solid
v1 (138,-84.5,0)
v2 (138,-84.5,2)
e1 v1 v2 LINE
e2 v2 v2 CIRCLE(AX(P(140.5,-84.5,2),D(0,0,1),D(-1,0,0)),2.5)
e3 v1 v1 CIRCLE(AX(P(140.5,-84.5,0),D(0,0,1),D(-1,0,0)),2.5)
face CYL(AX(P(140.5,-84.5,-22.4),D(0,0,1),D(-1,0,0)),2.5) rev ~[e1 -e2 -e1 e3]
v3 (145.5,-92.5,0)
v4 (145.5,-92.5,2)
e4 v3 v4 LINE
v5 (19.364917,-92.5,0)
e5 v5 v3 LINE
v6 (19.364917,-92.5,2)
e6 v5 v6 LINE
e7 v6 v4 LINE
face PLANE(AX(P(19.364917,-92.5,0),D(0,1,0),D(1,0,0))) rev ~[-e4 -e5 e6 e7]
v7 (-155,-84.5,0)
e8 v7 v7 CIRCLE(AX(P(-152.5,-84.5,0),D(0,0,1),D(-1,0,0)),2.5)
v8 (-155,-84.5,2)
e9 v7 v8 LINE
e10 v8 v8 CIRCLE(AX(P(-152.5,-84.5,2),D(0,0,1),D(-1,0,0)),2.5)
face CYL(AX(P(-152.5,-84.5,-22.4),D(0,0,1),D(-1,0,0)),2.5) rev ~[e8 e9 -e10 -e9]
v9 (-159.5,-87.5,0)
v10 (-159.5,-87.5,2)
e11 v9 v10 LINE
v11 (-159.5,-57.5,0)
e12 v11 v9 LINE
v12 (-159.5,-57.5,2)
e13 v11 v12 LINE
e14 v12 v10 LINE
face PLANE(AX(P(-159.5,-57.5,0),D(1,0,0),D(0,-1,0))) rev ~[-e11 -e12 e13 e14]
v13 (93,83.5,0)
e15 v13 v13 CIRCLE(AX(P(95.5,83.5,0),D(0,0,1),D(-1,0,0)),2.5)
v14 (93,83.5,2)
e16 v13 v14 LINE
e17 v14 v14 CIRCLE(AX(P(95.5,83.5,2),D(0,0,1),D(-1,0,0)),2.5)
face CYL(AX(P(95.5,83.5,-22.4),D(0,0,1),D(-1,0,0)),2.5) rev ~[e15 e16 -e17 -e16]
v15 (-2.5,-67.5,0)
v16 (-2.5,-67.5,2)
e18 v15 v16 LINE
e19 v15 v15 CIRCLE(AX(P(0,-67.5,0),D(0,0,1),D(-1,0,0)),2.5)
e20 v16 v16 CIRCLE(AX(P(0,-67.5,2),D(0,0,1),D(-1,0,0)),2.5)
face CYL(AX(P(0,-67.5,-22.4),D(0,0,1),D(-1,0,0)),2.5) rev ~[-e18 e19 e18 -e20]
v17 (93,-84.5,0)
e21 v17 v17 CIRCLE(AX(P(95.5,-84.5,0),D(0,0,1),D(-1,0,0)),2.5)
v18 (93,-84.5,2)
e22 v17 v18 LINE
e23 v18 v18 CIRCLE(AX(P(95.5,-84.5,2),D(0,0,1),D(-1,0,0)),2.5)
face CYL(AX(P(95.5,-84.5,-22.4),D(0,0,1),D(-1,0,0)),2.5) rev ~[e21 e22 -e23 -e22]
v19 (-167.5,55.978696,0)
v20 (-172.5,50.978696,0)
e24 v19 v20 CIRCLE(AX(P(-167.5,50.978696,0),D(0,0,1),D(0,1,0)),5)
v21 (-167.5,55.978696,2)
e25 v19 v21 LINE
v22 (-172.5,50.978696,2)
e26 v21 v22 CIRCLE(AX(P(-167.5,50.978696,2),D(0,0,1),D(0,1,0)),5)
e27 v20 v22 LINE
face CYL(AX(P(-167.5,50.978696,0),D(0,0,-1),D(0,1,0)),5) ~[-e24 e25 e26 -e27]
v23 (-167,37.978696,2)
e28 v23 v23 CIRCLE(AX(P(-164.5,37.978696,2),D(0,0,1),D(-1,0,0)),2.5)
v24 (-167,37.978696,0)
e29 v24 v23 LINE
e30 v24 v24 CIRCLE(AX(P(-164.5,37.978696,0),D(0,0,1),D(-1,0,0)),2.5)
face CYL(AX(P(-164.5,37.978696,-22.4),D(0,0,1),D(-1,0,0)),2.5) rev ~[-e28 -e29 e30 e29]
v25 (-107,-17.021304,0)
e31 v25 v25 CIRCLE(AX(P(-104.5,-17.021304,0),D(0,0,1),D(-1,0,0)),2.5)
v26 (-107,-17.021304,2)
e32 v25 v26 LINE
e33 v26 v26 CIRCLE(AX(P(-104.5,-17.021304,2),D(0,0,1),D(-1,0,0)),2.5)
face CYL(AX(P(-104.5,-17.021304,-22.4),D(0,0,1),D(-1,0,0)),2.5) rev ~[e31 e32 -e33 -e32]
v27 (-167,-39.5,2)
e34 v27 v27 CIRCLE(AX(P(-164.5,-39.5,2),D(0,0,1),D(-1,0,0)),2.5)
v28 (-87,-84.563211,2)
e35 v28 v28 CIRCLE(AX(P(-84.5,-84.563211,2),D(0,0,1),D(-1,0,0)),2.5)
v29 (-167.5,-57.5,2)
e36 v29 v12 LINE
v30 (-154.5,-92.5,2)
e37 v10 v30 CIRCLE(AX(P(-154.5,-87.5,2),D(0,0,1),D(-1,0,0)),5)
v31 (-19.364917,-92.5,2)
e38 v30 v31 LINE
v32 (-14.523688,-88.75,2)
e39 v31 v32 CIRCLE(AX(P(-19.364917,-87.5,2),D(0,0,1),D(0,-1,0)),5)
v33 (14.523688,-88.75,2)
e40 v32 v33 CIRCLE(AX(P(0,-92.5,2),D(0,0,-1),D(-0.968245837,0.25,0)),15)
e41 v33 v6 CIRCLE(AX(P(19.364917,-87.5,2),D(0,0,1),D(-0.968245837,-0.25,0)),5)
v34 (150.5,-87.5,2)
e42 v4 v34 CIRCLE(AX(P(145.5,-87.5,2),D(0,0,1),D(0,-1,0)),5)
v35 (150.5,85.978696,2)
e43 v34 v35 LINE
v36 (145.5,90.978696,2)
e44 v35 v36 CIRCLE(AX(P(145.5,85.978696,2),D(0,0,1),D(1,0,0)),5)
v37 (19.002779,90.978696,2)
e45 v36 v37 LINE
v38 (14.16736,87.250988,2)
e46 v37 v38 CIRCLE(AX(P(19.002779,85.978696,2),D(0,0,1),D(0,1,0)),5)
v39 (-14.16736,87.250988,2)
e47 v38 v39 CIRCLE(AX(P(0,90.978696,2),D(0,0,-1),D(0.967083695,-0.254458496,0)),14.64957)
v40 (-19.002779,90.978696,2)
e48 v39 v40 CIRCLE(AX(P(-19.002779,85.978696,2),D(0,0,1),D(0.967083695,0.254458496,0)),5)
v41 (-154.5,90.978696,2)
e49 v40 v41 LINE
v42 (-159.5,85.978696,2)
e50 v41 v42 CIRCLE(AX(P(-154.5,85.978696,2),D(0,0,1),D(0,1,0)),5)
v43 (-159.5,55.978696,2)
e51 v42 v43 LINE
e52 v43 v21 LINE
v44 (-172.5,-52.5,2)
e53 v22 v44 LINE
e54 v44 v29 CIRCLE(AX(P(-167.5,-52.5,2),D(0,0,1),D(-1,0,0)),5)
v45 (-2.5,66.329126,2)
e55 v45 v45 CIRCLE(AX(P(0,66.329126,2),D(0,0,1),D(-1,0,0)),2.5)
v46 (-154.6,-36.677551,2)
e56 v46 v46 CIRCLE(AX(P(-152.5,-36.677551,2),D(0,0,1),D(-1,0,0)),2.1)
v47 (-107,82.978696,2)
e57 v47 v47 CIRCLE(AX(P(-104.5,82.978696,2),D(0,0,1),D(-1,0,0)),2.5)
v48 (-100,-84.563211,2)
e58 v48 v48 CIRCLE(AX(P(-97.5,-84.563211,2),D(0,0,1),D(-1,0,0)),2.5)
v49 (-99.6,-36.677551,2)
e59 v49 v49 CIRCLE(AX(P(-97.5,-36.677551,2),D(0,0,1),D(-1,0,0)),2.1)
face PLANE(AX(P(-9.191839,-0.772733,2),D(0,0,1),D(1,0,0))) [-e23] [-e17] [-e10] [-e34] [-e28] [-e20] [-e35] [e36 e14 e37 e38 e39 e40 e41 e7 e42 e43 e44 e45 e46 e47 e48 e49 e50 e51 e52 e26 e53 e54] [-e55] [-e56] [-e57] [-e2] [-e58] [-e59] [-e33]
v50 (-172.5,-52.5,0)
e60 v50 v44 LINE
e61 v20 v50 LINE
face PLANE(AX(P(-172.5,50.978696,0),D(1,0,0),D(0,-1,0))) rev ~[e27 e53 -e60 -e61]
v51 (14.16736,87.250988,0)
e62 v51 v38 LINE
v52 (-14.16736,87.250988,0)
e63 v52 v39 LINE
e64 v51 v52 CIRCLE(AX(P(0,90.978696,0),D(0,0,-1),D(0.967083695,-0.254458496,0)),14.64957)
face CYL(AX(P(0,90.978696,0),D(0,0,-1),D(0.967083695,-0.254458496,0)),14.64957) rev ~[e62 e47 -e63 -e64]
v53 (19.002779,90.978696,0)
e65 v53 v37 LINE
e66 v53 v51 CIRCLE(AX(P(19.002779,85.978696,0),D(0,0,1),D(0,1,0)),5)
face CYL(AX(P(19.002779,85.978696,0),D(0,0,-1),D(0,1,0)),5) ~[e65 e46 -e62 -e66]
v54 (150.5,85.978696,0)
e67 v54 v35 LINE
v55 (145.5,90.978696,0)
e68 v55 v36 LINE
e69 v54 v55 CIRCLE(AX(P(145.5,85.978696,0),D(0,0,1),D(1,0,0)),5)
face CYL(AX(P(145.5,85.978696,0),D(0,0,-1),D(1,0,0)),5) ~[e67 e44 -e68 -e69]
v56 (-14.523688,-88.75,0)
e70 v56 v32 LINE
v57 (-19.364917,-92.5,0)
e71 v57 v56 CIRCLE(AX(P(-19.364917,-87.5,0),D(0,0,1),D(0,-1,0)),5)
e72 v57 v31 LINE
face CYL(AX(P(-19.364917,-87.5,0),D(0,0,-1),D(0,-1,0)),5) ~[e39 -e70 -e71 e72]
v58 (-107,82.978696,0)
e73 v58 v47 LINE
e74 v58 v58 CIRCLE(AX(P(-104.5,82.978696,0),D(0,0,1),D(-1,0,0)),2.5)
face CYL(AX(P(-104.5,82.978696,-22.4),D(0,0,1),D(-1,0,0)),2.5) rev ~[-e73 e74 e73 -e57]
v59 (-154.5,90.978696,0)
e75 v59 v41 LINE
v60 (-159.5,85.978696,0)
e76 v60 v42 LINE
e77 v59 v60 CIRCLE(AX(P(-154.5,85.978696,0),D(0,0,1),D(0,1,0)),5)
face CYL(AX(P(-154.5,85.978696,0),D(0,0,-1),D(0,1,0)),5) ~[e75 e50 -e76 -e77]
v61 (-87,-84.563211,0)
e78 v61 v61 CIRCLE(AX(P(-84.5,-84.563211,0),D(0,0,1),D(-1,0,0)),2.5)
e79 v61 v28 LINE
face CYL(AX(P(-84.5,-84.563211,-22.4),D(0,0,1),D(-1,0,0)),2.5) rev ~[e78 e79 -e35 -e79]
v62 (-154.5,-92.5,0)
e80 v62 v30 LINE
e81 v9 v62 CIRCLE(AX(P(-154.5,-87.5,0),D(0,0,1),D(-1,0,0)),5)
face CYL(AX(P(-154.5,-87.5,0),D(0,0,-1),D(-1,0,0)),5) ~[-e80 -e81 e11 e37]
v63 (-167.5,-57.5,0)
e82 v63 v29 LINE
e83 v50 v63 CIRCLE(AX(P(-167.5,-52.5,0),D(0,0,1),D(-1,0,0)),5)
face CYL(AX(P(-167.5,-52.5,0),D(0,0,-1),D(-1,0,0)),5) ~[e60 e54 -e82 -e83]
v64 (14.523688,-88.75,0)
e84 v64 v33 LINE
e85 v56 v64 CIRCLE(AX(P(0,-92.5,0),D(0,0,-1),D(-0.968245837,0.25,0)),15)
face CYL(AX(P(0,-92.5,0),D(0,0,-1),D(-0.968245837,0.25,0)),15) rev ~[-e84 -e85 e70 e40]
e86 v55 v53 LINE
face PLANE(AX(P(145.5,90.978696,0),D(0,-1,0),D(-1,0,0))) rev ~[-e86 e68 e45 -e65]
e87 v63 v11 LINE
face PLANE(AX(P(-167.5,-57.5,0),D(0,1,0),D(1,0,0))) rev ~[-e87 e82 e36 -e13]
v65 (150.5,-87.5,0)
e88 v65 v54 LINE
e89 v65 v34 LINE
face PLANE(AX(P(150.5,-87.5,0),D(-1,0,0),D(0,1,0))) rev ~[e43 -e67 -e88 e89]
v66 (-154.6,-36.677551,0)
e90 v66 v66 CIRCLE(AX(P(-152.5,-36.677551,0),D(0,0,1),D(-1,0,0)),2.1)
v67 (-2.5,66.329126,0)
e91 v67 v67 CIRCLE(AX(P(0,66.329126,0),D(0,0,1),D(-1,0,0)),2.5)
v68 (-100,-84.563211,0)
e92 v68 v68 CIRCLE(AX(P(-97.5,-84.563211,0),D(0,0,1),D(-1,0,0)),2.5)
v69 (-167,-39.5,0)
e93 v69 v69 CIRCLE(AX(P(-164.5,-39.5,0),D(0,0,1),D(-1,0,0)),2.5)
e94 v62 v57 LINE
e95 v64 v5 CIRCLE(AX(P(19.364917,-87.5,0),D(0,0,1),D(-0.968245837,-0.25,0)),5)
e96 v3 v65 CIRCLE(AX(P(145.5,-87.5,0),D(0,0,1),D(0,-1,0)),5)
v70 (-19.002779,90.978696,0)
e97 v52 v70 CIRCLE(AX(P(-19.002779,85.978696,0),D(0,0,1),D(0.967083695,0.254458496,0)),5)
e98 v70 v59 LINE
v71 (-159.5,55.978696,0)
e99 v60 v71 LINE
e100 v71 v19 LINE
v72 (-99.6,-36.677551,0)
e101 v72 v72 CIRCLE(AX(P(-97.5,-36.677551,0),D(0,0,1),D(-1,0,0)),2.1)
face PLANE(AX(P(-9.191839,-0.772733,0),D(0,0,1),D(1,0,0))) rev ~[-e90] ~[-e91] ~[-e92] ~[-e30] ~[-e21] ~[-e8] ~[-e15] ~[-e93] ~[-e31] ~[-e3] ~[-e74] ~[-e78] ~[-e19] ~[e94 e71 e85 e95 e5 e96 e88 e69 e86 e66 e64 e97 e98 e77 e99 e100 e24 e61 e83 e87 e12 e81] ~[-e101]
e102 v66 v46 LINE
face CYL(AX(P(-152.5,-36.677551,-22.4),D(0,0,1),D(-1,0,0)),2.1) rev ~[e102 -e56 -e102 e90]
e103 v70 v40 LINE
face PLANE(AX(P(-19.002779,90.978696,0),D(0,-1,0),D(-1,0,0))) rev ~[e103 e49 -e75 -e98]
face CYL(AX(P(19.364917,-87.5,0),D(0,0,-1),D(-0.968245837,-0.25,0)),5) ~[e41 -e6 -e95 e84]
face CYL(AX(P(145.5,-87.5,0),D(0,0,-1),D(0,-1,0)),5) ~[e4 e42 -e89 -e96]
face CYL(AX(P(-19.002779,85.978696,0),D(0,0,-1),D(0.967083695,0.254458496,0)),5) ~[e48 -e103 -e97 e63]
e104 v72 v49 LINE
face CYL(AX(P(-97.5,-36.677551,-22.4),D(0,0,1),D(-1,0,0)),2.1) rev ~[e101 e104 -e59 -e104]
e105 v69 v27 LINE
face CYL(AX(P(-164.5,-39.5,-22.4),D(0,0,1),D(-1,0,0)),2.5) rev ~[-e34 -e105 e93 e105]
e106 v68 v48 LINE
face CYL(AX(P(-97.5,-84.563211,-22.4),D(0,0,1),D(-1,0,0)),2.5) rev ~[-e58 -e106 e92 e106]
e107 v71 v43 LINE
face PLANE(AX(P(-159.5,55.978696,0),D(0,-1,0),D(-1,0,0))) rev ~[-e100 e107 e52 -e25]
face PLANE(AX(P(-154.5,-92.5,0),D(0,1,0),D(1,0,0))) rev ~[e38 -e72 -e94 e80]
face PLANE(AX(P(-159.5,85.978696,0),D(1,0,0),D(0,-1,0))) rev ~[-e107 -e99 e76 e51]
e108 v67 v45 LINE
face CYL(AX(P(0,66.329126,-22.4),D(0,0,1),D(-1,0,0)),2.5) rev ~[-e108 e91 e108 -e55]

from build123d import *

# Parameters (mm, degrees)
F1_DEPTH = 2
F2_D     = 5
F2_DEPTH = 22.4
F2_TIP   = 1.5021515476
F3_D     = 4.2
F3_DEPTH = 22.4
F3_TIP   = 1.2618073
F4_D     = 5
F4_DEPTH = 22.4
F4_TIP   = 1.5021515476
F5_D     = 5
F5_DEPTH = 22.4
F5_TIP   = 1.5021515476


# Not quite as in the source:
# - a feature names something its author has since deleted; it is built from what else it names


with BuildPart() as f1:
    # F0 (on Top) → F1 (new body)
    with BuildSketch(Plane.XY):
        with BuildLine():
            Line((-19.0027786864, 90.978695631), (-154.5, 90.978695631))
            ThreePointArc((-154.5, 90.978695631), (-158.0355339059, 89.514229537), (-159.5, 85.978695631))
            Line((-159.5, 85.978695631), (-159.5, 55.978695631))
            Line((-159.5, 55.978695631), (-167.5, 55.978695631))
            ThreePointArc((-167.5, 55.978695631), (-171.0355339059, 54.514229537), (-172.5, 50.978695631))
            Line((-172.5, 50.978695631), (-172.5, -52.5))
            ThreePointArc((-172.5, -52.5), (-171.0355339059, -56.0355339059), (-167.5, -57.5))
            Line((-167.5, -57.5), (-159.5, -57.5))
            Line((-159.5, -57.5), (-159.5, -87.5))
            ThreePointArc((-159.5, -87.5), (-158.0355339059, -91.0355339059), (-154.5, -92.5))
            Line((-154.5, -92.5), (-19.364916731, -92.5))
            ThreePointArc((-19.364916731, -92.5), (-16.3030545526, -91.4528470752), (-14.5236875483, -88.75))
            ThreePointArc((-14.5236875483, -88.75), (0, -77.5), (14.5236875483, -88.75))
            ThreePointArc((14.5236875483, -88.75), (16.3030545526, -91.4528470752), (19.364916731, -92.5))
            Line((19.364916731, -92.5), (145.5, -92.5))
            ThreePointArc((145.5, -92.5), (149.0355339059, -91.0355339059), (150.5, -87.5))
            Line((150.5, -87.5), (150.5, 85.978695631))
            ThreePointArc((150.5, 85.978695631), (149.0355339059, 89.514229537), (145.5, 90.978695631))
            Line((145.5, 90.978695631), (19.0027786864, 90.978695631))
            ThreePointArc((19.0027786864, 90.978695631), (15.9500309398, 89.9385859319), (14.1673602092, 87.2509881092))
            ThreePointArc((14.1673602092, 87.2509881092), (0, 76.329125717), (-14.1673602092, 87.2509881092))
            ThreePointArc((-14.1673602092, 87.2509881092), (-15.9500309398, 89.9385859319), (-19.0027786864, 90.978695631))
        make_face()
    extrude(amount=F1_DEPTH)

    # F2
    with Locations(Plane(origin=(0, 0, 0), x_dir=(1, 0, 0), z_dir=(0, 0, -1))):
        with Locations((-104.5, -82.978695631), (95.5, -83.5), (162.5, -84.5), (140.5, 84.5), (95.5, 84.5), (-97.5, 84.5632106066), (-152.5, 84.5)):
            Hole(F2_D / 2, depth=F2_DEPTH)
            with Locations((0, 0, -(F2_DEPTH + F2_TIP / 2))):  # 118° drill point
                Cone(0, F2_D / 2, F2_TIP, mode=Mode.SUBTRACT)

    # F3
    with Locations(Plane(origin=(0, 0, 0), x_dir=(1, 0, 0), z_dir=(0, 0, -1))):
        with Locations((-97.5, 36.6775505245), (-152.5, 36.6775505245)):
            Hole(F3_D / 2, depth=F3_DEPTH)
            with Locations((0, 0, -(F3_DEPTH + F3_TIP / 2))):  # 118° drill point
                Cone(0, F3_D / 2, F3_TIP, mode=Mode.SUBTRACT)

    # F4
    with Locations(Plane(origin=(0, 0, 0), x_dir=(1, 0, 0), z_dir=(0, 0, -1))):
        with Locations((-164.5, -37.978695631), (-164.5, 39.5), (-104.5, 17.021304369), (0, 67.5), (0, -66.329125717), (95.5, -83.5), (95.5, 84.5), (140.5, 84.5), (162.5, -84.5)):
            Hole(F4_D / 2, depth=F4_DEPTH)
            with Locations((0, 0, -(F4_DEPTH + F4_TIP / 2))):  # 118° drill point
                Cone(0, F4_D / 2, F4_TIP, mode=Mode.SUBTRACT)

    # F5
    with Locations(Plane(origin=(0, 0, 0), x_dir=(1, 0, 0), z_dir=(0, 0, -1))):
        with Locations((-84.5, 84.5632106066)):
            Hole(F5_D / 2, depth=F5_DEPTH)
            with Locations((0, 0, -(F5_DEPTH + F5_TIP / 2))):  # 118° drill point
                Cone(0, F5_D / 2, F5_TIP, mode=Mode.SUBTRACT)


solid = f1.part
